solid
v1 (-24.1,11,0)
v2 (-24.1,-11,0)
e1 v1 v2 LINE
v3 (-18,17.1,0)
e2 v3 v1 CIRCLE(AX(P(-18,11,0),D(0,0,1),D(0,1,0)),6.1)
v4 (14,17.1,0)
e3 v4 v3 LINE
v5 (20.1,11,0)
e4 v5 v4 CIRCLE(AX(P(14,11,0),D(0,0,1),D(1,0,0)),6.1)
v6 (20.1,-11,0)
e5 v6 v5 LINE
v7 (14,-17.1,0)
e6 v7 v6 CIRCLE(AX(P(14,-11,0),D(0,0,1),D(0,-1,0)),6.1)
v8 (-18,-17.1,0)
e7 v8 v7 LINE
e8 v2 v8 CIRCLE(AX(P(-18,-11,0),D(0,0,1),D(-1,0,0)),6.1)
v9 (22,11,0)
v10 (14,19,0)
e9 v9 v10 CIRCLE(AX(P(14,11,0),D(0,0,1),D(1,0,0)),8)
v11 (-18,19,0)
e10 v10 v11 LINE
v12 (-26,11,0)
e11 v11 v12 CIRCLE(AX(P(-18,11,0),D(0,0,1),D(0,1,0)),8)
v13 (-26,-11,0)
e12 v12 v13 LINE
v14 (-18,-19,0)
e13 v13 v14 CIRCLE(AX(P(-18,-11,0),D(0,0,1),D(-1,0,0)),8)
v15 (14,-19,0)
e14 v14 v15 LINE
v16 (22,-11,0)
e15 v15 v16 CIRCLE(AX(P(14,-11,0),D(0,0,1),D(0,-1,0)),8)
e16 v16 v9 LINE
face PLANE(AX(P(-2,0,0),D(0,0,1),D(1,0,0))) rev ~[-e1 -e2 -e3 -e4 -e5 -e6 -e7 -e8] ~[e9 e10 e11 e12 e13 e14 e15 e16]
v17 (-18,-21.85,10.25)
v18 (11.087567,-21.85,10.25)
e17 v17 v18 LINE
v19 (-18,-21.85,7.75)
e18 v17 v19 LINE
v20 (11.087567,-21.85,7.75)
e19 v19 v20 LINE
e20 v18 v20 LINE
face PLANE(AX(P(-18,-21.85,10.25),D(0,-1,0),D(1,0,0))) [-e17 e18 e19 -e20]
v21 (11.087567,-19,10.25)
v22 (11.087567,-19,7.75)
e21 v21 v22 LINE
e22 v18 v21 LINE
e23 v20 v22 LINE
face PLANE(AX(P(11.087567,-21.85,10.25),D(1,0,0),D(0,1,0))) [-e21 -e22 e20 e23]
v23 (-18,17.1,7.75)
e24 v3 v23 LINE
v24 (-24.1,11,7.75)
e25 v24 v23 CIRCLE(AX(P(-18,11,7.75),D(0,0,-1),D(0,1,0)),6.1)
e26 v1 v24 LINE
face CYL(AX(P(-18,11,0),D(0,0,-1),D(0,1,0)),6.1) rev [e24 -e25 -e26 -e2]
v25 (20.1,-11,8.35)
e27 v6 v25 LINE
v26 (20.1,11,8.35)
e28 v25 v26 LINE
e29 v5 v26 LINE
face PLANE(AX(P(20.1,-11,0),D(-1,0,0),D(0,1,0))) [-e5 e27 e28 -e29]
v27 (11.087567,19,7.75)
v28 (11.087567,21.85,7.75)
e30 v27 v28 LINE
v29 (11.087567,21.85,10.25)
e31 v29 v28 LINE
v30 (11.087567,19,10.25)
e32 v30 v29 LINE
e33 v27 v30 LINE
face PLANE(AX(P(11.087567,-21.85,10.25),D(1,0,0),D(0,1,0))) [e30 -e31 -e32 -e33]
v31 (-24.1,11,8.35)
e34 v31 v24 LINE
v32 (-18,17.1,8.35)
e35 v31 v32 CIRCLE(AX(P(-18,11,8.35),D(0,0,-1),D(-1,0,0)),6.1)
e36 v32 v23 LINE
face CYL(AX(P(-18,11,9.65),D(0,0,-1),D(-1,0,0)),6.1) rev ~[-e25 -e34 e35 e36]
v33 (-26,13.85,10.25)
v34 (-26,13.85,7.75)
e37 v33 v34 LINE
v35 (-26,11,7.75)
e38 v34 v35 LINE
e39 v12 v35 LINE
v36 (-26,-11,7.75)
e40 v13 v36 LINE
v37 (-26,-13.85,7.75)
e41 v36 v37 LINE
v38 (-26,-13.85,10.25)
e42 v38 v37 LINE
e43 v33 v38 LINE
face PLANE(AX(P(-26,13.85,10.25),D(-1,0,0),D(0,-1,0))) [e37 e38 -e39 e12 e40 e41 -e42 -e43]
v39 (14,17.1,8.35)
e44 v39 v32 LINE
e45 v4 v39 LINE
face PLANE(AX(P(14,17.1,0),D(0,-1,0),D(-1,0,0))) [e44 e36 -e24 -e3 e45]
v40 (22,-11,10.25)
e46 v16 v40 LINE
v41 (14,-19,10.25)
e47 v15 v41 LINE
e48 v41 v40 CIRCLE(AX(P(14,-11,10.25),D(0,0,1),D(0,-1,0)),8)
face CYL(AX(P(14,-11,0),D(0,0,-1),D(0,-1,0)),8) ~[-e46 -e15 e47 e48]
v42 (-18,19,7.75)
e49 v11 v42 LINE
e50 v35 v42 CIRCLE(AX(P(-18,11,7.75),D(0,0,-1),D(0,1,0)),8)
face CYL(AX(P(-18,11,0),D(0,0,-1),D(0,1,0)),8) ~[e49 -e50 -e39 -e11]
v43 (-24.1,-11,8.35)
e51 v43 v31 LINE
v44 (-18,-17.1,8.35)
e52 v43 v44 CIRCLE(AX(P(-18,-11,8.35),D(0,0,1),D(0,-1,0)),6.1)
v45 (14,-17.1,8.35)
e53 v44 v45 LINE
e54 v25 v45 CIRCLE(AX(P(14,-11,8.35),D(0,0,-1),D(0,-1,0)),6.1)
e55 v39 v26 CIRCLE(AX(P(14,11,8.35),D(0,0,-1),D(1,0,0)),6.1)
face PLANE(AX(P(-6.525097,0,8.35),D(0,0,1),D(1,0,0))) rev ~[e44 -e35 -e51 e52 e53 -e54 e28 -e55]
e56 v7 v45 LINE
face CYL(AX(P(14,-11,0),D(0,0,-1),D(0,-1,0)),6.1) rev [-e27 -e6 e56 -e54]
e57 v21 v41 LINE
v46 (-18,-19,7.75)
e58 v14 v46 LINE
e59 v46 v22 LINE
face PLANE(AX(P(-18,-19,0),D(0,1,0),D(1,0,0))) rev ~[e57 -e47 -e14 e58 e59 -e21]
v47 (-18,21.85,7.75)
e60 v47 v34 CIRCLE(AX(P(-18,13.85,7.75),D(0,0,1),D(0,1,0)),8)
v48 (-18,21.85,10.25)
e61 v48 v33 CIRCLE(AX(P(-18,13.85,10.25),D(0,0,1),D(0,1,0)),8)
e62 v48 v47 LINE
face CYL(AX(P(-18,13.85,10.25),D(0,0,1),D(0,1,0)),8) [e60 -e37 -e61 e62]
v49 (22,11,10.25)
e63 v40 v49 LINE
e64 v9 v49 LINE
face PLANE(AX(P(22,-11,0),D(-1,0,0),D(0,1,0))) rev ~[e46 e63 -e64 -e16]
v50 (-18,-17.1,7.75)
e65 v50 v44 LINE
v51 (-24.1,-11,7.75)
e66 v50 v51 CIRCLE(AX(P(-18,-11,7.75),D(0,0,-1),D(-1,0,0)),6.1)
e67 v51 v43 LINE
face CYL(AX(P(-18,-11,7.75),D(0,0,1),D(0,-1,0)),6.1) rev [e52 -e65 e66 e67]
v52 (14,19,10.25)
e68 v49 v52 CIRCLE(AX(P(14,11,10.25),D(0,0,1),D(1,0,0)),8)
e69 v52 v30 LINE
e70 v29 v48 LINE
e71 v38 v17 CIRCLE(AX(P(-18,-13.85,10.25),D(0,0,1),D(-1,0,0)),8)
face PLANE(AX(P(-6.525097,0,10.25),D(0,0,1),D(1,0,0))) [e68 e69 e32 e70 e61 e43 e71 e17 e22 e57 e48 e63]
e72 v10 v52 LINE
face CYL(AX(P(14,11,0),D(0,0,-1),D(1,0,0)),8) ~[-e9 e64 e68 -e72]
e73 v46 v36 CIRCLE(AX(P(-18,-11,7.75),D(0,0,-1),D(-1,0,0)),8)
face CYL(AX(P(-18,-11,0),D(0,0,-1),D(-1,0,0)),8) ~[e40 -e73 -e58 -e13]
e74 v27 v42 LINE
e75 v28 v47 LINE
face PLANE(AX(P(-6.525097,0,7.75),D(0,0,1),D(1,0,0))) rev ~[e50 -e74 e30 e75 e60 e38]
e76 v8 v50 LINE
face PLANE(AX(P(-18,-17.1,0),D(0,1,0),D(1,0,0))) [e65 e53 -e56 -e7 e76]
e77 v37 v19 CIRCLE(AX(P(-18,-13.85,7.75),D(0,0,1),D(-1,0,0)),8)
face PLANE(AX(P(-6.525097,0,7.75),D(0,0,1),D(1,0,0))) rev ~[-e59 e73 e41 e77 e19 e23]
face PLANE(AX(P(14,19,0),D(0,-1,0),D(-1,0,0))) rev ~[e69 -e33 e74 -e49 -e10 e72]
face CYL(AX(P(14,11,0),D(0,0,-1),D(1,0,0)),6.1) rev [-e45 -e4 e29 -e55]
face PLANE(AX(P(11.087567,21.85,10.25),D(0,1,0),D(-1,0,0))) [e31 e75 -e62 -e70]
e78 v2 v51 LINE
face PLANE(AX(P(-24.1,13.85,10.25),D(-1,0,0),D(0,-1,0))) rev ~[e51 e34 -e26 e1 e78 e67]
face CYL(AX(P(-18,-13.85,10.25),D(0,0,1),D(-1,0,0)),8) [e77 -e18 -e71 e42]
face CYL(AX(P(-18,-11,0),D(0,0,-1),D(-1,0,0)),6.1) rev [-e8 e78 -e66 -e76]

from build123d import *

# Parameters (mm, degrees)
F1_DEPTH     = 10.25
F3_DEPTH     = 2.5
F5_T         = 1.9
F5_T3_DEPTH  = 32.8875665362
F5_T5_DEPTH  = 6.3
F5_T8_ANGLE  = 90.000000001
F5_T10_ANGLE = 90.000000001


# Not quite as in the source:
# - a shell that OpenCascade refuses in one call is made with other operations: the cavity is built on its own and cut out


with BuildPart() as f1:
    # F0 (on Top) → F1 (new body)
    with BuildSketch(Plane.XY):
        with BuildLine():
            Line((14, 19), (-18, 19))
            ThreePointArc((-18, 19), (-23.6568542495, 16.6568542495), (-26, 11))
            Line((-26, 11), (-26, -11))
            ThreePointArc((-26, -11), (-23.6568542495, -16.6568542495), (-18, -19))
            Line((-18, -19), (14, -19))
            ThreePointArc((14, -19), (19.6568542495, -16.6568542495), (22, -11))
            Line((22, -11), (22, 11))
            ThreePointArc((22, 11), (19.6568542495, 16.6568542495), (14, 19))
        make_face()
    extrude(amount=F1_DEPTH)

    # F2 (on face) → F3 (join)
    with BuildSketch(Plane.XY.offset(10.25)):
        with BuildLine():
            Line((11.0875665362, 21.85), (-18, 21.85))
            ThreePointArc((-18, 21.85), (-23.6568542495, 19.5068542495), (-26, 13.85))
            Line((-26, 13.85), (-26, -13.85))
            ThreePointArc((-26, -13.85), (-23.6568542495, -19.5068542495), (-18, -21.85))
            Line((-18, -21.85), (11.0875665362, -21.85))
            Line((11.0875665362, -21.85), (11.0875665362, 21.85))
        make_face()
    extrude(amount=-F3_DEPTH)

    # F5: shell of thickness 1.9, made by hand


with BuildPart() as f5_core1:
    # F5_t2: copy of F1
    add(f1.part)

    # the walls: a layer under each face that stays
    f5_faces = [f5_core1.faces().sort_by_distance(p)[0] for p in [
        (-2, 19, 5.125),
        (19.6568542495, 16.6568542495, 5.125),
        (22, 0, 5.125),
        (19.6568542495, -16.6568542495, 5.125),
        (-2, -19, 5.125),
        (-23.6568542495, -16.6568542495, 3.875),
        (-26, 0, 5.125),
        (-23.6568542495, -19.5068542495, 9),
        (-3.4562167319, -21.85, 9),
        (-23.6568542495, 19.5068542495, 9),
        (-3.4562167319, 21.85, 9),
        (-19.8187389106, -20.0416666667, 7.75),
        (11.0875665362, -20.425, 9),
        (-2, 0, 10.25),
        (11.0875665362, 20.425, 9),
        (-19.8187389106, 20.0416666667, 7.75),
        (-23.6568542495, 16.6568542495, 3.875),
    ]]
    thicken(f5_faces, amount=-F5_T, mode=Mode.SUBTRACT)

    # F5_s4 → F5_t3 (cut)
    with BuildSketch(Plane.YZ.offset(-19.9)):
        Polygon((19.019, 7.731), (17.1, 7.75), (17.1, 9.65), (19, 9.65), align=None)
        Polygon((-19.019, 7.731), (-17.1, 7.75), (-17.1, 9.65), (-19, 9.65), align=None)
    extrude(amount=F5_T3_DEPTH, mode=Mode.SUBTRACT)

    # F5_s6 → F5_t5 (cut)
    with BuildSketch(Plane.XY.offset(5.85)):
        Polygon((11.1065665362, 19.019), (11.0875665362, 17.1), (9.1875665362, 17.1), (9.1875665362, 19), align=None)
        Polygon((11.1065665362, -19.019), (11.0875665362, -17.1), (9.1875665362, -17.1), (9.1875665362, -19), align=None)
    extrude(amount=F5_T5_DEPTH, mode=Mode.SUBTRACT)

    # F5_s7 → F5_t8 (revolve, cut)
    with BuildSketch(Plane.YZ.offset(-18)):
        Polygon((-19.019, 7.731), (-17.1, 7.75), (-17.1, 9.65), (-19, 9.65), align=None)
    revolve(axis=Axis((-18, -11, 7.75), (0, 0, -1)), revolution_arc=F5_T8_ANGLE, mode=Mode.SUBTRACT)

    # F5_s9 → F5_t10 (revolve, cut)
    with BuildSketch(Plane.XZ.offset(-11)):
        Polygon((-26.019, 7.731), (-26, 9.65), (-24.1, 9.65), (-24.1, 7.75), align=None)
    revolve(axis=Axis((-18, 11, 7.75), (0, 0, -1)), revolution_arc=F5_T10_ANGLE, mode=Mode.SUBTRACT)


with BuildPart() as f1_1:
    add(f1.part)

    # what is left inside the walls is the cavity
    f5_cavity = [f5_core1.part.solids().sort_by_distance(p)[0] for p in [
        (-2, -5.7, 0.019),
    ]]
    add(f5_cavity, mode=Mode.SUBTRACT)


solid = f1_1.part
